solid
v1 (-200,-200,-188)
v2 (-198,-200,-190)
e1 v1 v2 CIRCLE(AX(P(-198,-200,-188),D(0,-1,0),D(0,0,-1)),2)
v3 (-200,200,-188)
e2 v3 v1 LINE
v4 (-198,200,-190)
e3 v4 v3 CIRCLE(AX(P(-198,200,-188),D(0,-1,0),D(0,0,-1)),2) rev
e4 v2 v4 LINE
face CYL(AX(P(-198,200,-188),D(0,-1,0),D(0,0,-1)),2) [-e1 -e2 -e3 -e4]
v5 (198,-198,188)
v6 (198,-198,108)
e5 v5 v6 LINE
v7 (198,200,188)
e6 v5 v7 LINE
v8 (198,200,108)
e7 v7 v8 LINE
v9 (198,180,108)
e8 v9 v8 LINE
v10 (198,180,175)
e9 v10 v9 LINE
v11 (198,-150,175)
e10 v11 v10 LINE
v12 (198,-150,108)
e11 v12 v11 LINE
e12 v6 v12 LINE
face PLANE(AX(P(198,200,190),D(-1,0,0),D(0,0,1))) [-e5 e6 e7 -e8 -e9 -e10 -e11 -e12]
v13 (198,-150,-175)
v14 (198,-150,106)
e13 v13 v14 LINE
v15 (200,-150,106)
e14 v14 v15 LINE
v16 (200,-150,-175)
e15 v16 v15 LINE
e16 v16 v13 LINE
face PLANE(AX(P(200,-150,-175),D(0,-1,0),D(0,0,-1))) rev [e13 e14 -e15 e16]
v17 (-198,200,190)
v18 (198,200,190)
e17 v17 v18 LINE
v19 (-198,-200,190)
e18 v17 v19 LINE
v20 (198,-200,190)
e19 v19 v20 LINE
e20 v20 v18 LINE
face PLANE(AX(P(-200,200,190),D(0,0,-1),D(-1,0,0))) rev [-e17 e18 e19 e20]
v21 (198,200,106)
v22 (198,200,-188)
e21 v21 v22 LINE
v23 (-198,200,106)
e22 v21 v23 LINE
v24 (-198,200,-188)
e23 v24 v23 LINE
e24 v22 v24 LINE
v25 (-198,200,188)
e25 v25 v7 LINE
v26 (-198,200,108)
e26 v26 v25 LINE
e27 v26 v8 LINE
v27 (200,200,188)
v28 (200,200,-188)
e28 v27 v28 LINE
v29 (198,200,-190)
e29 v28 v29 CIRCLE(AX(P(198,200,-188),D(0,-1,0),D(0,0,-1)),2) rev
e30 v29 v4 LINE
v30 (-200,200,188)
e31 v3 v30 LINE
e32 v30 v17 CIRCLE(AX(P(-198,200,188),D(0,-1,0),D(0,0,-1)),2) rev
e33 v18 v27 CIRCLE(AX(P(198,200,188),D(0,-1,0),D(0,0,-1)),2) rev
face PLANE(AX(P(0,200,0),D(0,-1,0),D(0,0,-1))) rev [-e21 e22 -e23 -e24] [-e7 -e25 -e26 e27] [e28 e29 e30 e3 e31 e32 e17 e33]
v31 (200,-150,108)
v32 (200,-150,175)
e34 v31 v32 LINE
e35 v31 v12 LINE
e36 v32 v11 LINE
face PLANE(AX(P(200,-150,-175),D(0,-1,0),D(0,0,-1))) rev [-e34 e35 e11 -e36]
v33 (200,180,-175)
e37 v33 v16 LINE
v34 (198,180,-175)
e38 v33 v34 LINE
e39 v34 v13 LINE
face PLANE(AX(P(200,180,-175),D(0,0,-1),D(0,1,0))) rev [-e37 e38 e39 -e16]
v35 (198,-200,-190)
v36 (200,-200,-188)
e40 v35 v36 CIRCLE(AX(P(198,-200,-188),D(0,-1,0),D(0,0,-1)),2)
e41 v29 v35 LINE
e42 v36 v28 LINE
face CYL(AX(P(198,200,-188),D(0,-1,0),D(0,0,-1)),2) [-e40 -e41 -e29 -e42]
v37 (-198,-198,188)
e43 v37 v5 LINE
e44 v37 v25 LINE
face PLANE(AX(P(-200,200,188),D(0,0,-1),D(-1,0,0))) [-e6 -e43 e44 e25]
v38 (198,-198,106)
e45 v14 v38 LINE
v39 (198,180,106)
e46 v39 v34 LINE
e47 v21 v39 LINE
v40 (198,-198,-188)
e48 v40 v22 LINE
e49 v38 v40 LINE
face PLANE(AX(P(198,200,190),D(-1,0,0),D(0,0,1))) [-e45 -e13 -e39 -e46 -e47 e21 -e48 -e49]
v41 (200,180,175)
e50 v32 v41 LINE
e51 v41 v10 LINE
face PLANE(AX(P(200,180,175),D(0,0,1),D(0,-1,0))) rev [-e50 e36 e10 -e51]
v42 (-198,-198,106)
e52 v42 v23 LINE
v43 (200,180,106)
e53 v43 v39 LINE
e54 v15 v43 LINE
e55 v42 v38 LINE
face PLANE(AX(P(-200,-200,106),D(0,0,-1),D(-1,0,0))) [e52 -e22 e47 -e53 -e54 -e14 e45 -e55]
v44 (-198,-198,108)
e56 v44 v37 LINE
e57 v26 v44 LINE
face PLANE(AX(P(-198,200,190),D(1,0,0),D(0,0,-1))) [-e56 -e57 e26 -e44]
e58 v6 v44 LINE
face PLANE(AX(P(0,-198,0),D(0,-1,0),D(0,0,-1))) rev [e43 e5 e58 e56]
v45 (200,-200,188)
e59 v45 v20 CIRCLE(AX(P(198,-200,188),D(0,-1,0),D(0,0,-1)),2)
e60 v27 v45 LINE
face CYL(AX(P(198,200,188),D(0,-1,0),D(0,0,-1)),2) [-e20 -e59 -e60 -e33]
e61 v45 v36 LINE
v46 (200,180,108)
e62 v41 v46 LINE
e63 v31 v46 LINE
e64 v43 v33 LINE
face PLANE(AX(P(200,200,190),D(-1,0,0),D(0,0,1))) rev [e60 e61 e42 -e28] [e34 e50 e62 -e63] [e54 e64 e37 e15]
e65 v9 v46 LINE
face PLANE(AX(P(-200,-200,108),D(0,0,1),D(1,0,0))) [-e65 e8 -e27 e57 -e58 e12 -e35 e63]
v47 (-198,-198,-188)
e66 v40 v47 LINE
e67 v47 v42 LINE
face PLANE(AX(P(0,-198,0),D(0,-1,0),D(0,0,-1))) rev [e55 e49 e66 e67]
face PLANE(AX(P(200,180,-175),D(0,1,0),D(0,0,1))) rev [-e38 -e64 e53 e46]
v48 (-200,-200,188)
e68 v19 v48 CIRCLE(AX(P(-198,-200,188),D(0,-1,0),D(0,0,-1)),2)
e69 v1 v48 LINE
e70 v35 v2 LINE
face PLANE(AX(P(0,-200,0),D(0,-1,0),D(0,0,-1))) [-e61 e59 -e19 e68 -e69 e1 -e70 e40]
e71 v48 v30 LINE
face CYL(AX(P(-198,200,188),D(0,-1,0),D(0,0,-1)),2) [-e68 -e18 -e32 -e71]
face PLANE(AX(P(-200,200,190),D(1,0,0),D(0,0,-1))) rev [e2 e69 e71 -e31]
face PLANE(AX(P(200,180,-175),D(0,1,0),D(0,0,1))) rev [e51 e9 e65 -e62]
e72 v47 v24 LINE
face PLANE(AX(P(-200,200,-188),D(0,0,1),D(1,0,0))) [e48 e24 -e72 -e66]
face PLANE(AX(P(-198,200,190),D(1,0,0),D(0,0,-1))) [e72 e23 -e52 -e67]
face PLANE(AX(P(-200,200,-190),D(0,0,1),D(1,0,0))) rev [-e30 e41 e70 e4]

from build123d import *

# Parameters (mm, degrees)
SKETCH1_W           = 400
SKETCH1_H           = 380
BOSS_EXTRUDE1_DEPTH = 200
FILLET1_R           = 2
SHELL1_START        = -198
SHELL1_OUTLINE_W    = 398
SHELL1_OUTLINE_H    = 376
SHELL1_DEPTH        = 396
SKETCH2_W           = 350
SKETCH2_H           = 330
CUT_EXTRUDE1_DEPTH  = 485.256130576
BOSS_EXTRUDE2_REACH = 487.901
SKETCH3_W           = 400
SKETCH3_H           = 2


# Read off the part's stored shape, not the designer's step: Shell1
with BuildPart() as part:
    # Sketch1 → Boss-Extrude1 (new, symmetric)
    with BuildSketch(Plane(origin=(0, 0, 0), x_dir=(1, 0, 0), z_dir=(0, 1, 0))):
        Rectangle(SKETCH1_W, SKETCH1_H)
    extrude(amount=BOSS_EXTRUDE1_DEPTH, both=True)

    # Fillet1
    fillet1_edges = [part.edges().sort_by_distance(p)[0] for p in [
        (200, 0, 190),
        (-200, 0, 190),
        (-200, 0, -190),
        (200, 0, -190),
    ]]
    fillet(fillet1_edges, radius=FILLET1_R)

    # Shell1 outline → Shell1 (cut)
    with BuildSketch(Plane.YZ.offset(SHELL1_START)):
        with Locations((1, 0)):
            Rectangle(SHELL1_OUTLINE_W, SHELL1_OUTLINE_H)
    extrude(amount=SHELL1_DEPTH, mode=Mode.SUBTRACT)

    # Sketch2 → Cut-Extrude1 (cut, through all)
    with BuildSketch(Plane.ZY.offset(-198)):
        with Locations((0, 15)):
            Rectangle(SKETCH2_W, SKETCH2_H)
    extrude(amount=-CUT_EXTRUDE1_DEPTH, mode=Mode.SUBTRACT)

    # Sketch3 → Boss-Extrude2 (add, up to next)
    with BuildSketch(Plane(origin=(0, 200, 0), x_dir=(1, 0, 0), z_dir=(0, 1, 0)), mode=Mode.PRIVATE) as boss_extrude2_sk1:
        with Locations((0, -107)):
            Rectangle(SKETCH3_W, SKETCH3_H)
    boss_extrude2_tool1 = extrude(boss_extrude2_sk1.sketch, amount=-BOSS_EXTRUDE2_REACH, mode=Mode.PRIVATE) - part.part
    add(boss_extrude2_tool1.solids().sort_by_distance((0, 200, 107))[0])


solid = part.part
